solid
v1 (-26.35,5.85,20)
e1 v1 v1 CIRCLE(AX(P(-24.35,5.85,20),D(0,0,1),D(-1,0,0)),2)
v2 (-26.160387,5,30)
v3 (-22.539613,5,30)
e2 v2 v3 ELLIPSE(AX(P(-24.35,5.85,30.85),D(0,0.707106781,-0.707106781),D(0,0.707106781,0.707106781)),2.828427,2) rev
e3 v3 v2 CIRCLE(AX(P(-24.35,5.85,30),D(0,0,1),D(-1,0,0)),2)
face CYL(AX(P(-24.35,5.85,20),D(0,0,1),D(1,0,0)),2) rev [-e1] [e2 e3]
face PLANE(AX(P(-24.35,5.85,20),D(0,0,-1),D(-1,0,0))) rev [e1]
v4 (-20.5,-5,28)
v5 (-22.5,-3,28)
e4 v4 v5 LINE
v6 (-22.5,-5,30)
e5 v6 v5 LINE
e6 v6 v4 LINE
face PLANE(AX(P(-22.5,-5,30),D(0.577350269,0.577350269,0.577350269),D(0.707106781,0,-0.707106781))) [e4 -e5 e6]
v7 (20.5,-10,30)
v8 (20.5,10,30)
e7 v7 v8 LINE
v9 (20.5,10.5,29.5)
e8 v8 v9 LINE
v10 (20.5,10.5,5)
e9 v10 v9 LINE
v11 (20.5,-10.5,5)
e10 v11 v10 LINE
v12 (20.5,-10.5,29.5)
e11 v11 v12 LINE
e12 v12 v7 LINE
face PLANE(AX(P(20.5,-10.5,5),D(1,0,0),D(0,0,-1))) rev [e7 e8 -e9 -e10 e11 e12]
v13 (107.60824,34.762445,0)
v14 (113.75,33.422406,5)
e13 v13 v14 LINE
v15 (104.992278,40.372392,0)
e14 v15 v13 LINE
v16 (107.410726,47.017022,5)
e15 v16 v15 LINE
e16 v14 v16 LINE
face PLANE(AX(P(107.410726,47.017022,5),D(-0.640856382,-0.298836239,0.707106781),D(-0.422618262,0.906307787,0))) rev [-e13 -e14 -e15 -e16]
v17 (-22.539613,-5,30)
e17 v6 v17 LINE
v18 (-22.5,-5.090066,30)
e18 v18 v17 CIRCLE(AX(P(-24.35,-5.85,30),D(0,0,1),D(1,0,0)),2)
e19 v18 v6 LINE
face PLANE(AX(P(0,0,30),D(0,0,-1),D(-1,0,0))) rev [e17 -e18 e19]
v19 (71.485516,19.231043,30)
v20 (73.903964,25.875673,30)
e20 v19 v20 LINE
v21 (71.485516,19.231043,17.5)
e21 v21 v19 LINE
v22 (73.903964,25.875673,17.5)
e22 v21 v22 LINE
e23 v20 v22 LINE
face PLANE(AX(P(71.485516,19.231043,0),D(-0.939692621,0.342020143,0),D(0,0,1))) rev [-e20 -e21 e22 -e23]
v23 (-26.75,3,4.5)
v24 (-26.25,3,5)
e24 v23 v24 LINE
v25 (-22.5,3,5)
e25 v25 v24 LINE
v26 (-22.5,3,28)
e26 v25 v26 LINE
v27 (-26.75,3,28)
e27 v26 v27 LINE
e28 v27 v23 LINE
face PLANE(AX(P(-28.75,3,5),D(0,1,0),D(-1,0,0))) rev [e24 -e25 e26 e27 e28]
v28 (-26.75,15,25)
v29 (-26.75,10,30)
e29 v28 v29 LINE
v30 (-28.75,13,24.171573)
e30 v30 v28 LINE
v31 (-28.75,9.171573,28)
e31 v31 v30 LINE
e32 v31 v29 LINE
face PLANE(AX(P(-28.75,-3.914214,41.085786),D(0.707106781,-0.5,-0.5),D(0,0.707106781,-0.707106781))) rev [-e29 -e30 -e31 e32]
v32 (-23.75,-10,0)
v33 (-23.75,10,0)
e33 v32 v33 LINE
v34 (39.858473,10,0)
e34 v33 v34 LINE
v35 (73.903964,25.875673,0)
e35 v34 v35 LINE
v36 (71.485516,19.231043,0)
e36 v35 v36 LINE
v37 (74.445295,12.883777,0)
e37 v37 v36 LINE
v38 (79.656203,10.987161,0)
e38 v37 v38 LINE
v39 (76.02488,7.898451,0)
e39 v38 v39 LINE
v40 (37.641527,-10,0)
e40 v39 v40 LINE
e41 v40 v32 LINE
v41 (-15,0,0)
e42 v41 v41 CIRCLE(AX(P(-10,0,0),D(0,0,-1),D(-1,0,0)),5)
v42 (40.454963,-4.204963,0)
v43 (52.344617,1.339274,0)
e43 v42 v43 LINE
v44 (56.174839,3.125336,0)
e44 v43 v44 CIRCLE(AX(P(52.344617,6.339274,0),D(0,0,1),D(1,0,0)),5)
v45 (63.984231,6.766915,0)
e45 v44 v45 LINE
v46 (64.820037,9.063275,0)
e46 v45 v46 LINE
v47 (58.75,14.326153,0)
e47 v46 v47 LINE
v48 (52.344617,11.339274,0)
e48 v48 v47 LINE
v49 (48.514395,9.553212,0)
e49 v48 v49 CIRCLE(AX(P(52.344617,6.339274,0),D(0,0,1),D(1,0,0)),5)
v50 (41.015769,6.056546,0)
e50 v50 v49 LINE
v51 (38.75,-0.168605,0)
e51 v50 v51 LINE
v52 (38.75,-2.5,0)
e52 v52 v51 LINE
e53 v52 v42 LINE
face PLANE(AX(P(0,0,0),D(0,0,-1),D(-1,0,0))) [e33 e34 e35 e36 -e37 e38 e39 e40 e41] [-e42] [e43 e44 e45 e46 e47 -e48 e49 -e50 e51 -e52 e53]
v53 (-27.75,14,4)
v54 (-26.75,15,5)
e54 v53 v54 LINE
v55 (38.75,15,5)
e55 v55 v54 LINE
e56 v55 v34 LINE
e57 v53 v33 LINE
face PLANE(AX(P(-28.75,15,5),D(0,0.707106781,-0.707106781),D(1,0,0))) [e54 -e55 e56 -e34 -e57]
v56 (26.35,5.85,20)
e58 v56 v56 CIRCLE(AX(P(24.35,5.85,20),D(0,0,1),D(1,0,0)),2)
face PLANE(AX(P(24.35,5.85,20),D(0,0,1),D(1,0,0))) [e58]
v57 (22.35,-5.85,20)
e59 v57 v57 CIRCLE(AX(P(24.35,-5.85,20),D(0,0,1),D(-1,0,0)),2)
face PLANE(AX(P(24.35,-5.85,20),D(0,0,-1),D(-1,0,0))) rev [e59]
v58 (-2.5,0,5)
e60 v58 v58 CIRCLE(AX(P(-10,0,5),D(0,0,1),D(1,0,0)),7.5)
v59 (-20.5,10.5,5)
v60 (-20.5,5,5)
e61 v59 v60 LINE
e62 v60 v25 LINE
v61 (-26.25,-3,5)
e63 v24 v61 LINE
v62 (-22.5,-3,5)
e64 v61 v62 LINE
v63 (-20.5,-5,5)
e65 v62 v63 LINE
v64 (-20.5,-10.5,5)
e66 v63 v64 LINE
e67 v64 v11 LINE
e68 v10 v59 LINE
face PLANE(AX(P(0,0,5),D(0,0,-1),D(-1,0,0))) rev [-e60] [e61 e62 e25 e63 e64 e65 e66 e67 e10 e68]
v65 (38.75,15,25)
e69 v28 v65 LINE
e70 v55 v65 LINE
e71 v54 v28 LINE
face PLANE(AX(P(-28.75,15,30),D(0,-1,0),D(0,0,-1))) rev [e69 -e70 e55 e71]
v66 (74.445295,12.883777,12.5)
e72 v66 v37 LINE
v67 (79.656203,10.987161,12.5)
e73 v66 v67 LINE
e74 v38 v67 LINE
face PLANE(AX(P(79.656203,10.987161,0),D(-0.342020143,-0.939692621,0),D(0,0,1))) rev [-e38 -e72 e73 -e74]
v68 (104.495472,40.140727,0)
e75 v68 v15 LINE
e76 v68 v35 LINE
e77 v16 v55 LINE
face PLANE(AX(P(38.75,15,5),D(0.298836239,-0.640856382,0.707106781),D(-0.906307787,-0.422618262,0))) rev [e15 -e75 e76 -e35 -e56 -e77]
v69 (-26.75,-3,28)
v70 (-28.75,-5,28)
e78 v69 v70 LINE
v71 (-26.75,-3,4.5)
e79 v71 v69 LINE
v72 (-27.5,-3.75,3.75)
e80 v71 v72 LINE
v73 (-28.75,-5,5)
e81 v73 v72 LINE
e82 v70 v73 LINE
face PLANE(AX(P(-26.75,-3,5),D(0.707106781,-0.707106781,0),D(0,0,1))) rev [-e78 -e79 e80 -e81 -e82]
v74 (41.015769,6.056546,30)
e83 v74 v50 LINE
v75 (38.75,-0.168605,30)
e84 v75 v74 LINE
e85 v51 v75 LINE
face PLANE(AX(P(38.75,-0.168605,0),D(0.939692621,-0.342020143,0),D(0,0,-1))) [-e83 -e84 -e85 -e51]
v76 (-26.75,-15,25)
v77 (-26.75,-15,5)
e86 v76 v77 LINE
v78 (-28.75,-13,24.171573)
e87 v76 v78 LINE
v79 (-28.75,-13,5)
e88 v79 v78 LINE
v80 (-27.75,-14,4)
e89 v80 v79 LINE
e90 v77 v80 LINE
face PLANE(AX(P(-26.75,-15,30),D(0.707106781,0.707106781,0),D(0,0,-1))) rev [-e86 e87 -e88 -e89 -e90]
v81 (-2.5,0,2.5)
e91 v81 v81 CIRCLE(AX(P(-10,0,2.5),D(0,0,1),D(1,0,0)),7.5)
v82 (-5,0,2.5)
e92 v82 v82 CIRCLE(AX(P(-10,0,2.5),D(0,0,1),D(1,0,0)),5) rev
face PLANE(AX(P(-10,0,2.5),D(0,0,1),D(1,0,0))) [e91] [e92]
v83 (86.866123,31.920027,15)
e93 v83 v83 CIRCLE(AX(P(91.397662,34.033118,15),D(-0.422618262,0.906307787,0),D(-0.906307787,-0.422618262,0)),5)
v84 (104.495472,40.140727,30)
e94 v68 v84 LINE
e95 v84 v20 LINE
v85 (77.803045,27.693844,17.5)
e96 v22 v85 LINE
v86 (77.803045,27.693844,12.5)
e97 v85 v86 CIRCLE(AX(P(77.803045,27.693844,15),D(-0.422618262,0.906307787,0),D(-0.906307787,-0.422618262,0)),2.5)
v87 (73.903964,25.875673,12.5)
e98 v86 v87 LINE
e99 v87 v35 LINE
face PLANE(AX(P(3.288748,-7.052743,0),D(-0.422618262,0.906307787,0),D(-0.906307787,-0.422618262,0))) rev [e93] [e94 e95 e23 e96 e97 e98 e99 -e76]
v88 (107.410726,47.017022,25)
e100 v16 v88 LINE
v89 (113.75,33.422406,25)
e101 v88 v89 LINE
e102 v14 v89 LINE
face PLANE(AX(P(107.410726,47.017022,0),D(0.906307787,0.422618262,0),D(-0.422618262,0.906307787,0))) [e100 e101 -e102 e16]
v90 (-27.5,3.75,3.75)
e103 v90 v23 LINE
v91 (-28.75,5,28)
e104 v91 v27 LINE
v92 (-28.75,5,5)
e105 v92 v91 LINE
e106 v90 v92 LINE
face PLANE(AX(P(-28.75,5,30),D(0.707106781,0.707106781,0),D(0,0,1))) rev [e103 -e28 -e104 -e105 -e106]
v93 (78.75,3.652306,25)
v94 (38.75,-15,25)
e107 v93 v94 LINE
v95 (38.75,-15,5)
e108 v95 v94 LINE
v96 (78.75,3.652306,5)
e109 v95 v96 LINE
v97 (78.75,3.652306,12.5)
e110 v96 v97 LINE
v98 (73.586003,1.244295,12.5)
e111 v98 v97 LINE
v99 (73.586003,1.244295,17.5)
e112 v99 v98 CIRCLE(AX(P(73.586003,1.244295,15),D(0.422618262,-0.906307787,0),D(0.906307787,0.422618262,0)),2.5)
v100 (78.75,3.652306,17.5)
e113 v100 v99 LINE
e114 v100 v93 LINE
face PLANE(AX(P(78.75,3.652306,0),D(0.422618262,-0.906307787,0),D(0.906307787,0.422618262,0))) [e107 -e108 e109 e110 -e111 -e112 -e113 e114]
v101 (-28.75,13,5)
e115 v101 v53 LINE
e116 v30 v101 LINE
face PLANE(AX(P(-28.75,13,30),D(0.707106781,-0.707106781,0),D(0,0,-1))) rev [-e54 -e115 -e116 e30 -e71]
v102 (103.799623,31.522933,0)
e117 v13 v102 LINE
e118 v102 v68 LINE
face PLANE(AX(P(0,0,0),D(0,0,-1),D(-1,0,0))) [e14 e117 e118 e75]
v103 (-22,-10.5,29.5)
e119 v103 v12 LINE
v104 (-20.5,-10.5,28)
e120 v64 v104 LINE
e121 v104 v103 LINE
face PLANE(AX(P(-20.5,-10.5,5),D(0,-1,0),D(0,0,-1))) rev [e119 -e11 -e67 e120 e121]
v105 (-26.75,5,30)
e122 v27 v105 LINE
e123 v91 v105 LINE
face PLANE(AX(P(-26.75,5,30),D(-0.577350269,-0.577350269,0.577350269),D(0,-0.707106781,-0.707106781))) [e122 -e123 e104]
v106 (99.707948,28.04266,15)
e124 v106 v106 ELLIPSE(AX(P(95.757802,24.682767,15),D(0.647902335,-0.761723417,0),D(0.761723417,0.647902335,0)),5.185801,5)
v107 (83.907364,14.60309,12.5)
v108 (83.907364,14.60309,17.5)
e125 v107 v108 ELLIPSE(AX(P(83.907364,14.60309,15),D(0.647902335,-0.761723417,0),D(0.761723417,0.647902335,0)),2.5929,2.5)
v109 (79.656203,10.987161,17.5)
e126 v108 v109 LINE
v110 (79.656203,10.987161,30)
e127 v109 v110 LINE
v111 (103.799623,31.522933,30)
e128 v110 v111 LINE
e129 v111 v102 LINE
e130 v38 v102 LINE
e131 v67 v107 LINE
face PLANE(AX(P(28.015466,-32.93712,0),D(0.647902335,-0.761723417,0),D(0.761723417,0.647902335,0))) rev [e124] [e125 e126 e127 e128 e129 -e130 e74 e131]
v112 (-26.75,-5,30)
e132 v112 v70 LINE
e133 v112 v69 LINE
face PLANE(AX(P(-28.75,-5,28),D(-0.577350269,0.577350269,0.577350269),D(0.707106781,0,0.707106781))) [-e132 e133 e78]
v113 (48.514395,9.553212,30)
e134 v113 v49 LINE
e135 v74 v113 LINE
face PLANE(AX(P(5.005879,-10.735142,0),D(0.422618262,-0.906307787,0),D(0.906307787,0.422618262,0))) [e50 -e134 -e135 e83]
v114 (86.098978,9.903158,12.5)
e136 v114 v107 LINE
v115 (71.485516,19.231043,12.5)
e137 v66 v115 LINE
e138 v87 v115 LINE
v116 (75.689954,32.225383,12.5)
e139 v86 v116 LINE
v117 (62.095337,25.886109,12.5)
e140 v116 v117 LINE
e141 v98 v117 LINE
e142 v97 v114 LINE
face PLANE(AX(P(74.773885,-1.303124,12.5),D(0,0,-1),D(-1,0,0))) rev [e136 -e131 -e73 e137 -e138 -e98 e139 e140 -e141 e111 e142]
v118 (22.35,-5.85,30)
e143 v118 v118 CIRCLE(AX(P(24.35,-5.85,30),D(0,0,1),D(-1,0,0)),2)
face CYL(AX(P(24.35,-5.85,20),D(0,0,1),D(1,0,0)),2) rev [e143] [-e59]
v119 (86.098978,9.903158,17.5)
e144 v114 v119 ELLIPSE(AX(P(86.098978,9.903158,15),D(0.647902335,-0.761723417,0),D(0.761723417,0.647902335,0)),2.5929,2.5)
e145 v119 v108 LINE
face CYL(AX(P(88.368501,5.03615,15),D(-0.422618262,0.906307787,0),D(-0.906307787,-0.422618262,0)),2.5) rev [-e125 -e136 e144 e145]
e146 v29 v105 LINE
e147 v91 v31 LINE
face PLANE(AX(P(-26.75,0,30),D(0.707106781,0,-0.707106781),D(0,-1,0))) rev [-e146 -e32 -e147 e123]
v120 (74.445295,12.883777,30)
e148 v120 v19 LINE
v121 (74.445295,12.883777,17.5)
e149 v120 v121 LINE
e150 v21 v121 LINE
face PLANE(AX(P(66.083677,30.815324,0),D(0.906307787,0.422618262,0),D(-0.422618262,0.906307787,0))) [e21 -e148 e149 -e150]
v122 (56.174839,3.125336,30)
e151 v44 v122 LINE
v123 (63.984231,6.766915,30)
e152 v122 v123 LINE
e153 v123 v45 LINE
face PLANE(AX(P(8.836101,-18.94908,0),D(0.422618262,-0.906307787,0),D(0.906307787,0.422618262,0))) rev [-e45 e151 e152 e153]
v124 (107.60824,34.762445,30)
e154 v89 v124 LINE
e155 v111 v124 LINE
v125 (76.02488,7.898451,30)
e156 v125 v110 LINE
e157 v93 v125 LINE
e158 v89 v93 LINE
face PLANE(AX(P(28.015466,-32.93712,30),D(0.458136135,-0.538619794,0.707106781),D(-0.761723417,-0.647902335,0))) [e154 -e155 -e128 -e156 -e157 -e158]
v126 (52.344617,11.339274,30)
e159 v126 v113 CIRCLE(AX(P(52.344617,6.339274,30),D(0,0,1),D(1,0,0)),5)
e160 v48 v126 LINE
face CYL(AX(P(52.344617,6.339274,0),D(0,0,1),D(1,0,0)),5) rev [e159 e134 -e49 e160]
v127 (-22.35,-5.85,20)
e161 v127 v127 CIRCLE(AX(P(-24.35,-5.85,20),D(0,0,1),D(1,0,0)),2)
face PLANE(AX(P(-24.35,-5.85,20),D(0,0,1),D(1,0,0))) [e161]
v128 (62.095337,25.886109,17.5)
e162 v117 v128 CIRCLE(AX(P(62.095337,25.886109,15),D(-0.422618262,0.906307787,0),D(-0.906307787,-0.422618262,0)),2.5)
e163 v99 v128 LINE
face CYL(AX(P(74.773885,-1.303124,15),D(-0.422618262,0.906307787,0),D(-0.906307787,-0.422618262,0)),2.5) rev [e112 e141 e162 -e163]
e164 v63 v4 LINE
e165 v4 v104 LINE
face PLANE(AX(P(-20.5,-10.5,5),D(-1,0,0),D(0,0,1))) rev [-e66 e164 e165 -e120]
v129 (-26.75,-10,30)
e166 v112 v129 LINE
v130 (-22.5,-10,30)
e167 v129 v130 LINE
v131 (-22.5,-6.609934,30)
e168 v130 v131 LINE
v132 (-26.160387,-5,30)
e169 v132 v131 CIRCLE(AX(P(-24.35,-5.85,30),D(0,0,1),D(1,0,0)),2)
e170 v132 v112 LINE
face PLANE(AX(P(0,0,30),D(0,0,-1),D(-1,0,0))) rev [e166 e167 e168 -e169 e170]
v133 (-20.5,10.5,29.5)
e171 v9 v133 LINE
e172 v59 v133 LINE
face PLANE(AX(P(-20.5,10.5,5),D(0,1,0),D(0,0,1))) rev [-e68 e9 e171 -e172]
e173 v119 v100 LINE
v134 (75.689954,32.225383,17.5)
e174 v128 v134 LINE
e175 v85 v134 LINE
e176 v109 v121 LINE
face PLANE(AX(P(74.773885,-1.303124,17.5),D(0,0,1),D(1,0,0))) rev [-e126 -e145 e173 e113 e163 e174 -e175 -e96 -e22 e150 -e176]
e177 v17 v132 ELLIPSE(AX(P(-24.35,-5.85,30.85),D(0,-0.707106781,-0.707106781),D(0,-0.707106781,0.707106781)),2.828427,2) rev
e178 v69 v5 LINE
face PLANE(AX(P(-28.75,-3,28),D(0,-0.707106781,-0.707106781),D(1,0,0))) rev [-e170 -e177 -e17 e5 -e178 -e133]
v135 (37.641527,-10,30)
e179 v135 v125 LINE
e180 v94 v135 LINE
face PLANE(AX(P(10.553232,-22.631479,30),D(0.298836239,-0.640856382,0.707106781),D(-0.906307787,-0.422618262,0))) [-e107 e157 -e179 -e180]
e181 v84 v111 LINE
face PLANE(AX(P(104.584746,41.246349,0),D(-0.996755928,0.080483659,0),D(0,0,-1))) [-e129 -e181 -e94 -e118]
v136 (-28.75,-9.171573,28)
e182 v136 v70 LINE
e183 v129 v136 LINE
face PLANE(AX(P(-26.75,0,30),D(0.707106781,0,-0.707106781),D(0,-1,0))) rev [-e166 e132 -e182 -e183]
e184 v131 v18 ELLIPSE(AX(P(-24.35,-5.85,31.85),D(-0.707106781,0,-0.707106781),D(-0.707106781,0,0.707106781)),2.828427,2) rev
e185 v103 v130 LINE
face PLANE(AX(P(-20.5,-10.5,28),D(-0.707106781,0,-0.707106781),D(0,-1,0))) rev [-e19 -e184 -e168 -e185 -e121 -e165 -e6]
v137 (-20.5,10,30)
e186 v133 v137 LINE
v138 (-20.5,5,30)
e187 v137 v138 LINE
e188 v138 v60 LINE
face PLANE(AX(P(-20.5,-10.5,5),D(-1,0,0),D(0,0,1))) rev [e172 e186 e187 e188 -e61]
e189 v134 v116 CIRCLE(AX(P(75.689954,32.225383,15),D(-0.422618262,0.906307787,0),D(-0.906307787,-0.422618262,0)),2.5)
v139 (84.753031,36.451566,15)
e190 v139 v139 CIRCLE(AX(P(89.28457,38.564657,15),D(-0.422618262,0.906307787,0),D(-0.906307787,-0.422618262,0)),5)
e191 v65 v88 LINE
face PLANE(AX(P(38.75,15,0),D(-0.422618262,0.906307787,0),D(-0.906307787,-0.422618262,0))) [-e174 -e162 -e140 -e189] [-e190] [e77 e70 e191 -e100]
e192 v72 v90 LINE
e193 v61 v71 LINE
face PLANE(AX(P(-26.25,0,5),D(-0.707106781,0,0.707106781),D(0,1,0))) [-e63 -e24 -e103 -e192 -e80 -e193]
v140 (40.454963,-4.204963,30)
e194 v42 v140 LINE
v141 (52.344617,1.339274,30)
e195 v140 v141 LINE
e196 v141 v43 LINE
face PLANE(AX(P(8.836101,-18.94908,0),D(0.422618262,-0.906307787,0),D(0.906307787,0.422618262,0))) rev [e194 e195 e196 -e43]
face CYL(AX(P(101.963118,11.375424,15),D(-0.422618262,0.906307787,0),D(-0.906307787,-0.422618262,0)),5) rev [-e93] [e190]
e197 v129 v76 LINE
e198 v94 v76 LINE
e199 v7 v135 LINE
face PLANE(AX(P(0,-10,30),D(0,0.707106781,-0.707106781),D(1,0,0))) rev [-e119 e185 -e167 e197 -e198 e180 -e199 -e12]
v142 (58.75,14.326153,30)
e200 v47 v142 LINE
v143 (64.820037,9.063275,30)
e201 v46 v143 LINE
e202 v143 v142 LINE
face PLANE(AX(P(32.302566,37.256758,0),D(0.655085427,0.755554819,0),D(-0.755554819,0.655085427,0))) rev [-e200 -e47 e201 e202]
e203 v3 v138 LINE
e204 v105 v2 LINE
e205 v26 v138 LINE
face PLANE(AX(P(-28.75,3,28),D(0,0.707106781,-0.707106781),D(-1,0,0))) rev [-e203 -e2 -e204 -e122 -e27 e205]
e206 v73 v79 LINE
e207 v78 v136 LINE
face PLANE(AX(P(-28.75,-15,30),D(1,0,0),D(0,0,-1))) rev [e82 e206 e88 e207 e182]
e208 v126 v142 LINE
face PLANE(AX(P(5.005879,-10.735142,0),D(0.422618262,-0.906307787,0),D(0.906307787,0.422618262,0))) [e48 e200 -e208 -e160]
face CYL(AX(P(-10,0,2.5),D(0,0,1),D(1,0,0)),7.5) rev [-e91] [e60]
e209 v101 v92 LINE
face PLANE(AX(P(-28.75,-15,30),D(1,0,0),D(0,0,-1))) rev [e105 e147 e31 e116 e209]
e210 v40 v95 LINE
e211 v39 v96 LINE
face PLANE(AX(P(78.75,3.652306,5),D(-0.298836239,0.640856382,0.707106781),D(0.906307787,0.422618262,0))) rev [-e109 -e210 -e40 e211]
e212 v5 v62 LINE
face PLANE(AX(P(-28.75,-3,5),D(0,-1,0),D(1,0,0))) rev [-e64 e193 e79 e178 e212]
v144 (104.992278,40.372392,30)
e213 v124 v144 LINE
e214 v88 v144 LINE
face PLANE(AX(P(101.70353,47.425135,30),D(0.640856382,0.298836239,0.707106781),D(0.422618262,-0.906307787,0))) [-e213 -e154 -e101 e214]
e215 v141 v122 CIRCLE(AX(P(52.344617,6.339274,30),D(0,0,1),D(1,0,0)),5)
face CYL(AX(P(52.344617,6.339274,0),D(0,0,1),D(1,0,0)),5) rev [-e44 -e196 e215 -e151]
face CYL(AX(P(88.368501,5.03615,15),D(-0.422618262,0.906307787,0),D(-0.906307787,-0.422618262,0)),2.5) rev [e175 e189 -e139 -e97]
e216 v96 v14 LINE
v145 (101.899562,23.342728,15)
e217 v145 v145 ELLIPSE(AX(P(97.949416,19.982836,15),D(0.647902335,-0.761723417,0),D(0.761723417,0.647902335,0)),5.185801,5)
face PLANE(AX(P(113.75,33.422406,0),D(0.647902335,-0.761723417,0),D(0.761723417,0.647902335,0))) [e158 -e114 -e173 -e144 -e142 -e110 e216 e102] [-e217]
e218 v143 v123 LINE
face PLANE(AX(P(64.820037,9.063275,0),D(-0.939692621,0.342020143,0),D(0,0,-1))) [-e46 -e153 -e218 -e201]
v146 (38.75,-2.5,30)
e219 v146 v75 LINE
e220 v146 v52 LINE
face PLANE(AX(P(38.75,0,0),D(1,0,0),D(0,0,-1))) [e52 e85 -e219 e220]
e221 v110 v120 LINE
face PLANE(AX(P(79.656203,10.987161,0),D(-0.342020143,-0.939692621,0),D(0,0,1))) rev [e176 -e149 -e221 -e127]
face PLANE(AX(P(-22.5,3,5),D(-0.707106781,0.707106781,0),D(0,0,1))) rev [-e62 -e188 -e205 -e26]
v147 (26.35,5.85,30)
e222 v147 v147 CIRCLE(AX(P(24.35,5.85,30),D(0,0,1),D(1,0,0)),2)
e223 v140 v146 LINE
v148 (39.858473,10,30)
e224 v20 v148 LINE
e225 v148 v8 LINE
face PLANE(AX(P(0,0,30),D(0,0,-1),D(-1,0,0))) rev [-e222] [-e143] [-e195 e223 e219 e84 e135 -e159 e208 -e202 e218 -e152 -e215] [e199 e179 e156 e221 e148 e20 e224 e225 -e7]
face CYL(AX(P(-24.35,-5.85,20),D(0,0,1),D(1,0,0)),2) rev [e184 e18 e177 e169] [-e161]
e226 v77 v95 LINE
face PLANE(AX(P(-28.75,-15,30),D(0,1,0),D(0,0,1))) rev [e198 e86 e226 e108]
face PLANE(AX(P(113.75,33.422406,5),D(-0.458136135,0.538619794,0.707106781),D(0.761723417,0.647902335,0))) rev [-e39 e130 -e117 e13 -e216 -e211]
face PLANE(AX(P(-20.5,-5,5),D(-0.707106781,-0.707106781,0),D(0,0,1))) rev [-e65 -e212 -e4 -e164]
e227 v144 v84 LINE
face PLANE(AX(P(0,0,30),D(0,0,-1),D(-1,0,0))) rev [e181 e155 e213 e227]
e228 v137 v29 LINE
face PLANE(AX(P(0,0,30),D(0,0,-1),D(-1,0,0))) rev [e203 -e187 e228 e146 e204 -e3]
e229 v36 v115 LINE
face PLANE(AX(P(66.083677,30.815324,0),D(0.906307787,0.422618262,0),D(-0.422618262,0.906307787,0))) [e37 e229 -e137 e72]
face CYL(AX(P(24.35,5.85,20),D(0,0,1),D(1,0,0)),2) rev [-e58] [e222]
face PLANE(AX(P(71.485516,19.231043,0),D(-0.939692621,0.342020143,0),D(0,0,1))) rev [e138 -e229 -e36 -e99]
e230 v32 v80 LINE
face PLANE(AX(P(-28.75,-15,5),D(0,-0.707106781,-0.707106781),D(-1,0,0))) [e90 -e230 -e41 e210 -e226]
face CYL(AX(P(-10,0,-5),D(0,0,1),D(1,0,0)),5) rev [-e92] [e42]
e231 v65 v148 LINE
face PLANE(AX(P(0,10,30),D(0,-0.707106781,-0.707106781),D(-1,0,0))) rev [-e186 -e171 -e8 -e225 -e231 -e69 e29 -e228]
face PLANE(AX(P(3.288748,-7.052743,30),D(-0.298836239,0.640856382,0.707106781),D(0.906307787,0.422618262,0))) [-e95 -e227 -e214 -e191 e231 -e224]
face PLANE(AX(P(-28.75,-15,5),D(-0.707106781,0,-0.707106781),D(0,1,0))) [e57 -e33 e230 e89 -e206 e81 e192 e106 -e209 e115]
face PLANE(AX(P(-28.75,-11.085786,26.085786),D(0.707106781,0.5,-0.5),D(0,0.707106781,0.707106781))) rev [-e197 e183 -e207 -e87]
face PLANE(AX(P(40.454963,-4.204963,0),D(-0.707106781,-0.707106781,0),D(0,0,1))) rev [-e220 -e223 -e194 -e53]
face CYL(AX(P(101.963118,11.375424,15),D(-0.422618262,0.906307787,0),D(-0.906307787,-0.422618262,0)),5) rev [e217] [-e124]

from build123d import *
from OCP.BRepFilletAPI import BRepFilletAPI_MakeChamfer

# Parameters (mm, degrees)
SKETCH1_W           = 57.5
SKETCH1_H           = 30
BOSS_EXTRUDE1_DEPTH = 30
SKETCH2_W           = 41
SKETCH2_H           = 21
CUT_EXTRUDE1_DEPTH  = 25
SKETCH8_R           = 2
CUT_EXTRUDE6_DEPTH  = 10
SKETCH9_W           = 8.25
SKETCH9_H           = 6
CUT_EXTRUDE7_DEPTH  = 25
SKETCH10_R          = 5
CUT_EXTRUDE8_DEPTH  = 10
BOSS_EXTRUDE4_DEPTH = 30
CUT_EXTRUDE9_DEPTH  = 30
CHAMFER3_SIZE       = 5
CHAMFER3_SIZE_2     = 7.15419636
CHAMFER3_SIZE_3     = 4.066852786
SKETCH16_R          = 5
CUT_EXTRUDE10_DEPTH = 30
CHAMFER5_SIZE       = 5
CHAMFER6_SIZE       = 2
CHAMFER7_SIZE       = 2.5
CHAMFER7_SIZE_2     = 1.767766953
CHAMFER8_SIZE       = 2.5
CHAMFER8_SIZE2      = 1.892599607
CHAMFER8_SIZE2_2    = 1.881218298
CHAMFER8_SIZE2_3    = 5.168604796
SKETCH19_R          = 5
CUT_EXTRUDE12_DEPTH = 30
SKETCH20_R          = 7.5
CUT_EXTRUDE13_DEPTH = 2.5


with BuildPart() as part:
    # Sketch1 → Boss-Extrude1 (new body)
    with BuildSketch(Plane.XY):
        Rectangle(SKETCH1_W, SKETCH1_H)
    extrude(amount=BOSS_EXTRUDE1_DEPTH)

    # Sketch2 → Cut-Extrude1 (cut)
    with BuildSketch(Plane.XY.offset(30)):
        Rectangle(SKETCH2_W, SKETCH2_H)
    extrude(amount=-CUT_EXTRUDE1_DEPTH, mode=Mode.SUBTRACT)

    # Sketch8 → Cut-Extrude6 (cut)
    with BuildSketch(Plane.XY.offset(30)):
        with Locations((24.35, 5.85)):
            Circle(SKETCH8_R)
        with Locations(Location((24.35, -5.85, 0), (0, 0, 180))):
            Circle(SKETCH8_R)
        with Locations((-24.35, -5.85)):
            Circle(SKETCH8_R)
        with Locations(Location((-24.35, 5.85, 0), (0, 0, 180))):
            Circle(SKETCH8_R)
    extrude(amount=-CUT_EXTRUDE6_DEPTH, mode=Mode.SUBTRACT)

    # Sketch9 → Cut-Extrude7 (cut)
    with BuildSketch(Plane.XY.offset(30)):
        with Locations((-24.625, 0)):
            Rectangle(SKETCH9_W, SKETCH9_H)
    extrude(amount=-CUT_EXTRUDE7_DEPTH, mode=Mode.SUBTRACT)

    # Sketch10 → Cut-Extrude8 (cut)
    with BuildSketch(Plane.XY.offset(5)):
        with Locations((-10, 0)):
            Circle(SKETCH10_R)
    extrude(amount=-CUT_EXTRUDE8_DEPTH, mode=Mode.SUBTRACT)

    # Sketch13 → Boss-Extrude4 (add)
    with BuildSketch(Plane.XY.offset(30)):
        Polygon((28.75, 15), (38.75, 15), (107.410726074, 47.017022383), (113.75, 33.422405577), (78.75, 3.652306326), (38.75, -15), (28.75, -15), align=None)
    extrude(amount=-BOSS_EXTRUDE4_DEPTH)

    # Sketch15 → Cut-Extrude9 (cut)
    with BuildSketch(Plane.XY.offset(30)):
        Polygon((38.75, 5), (38.75, 0), (38.75, -5), (66.25, 7.823460599), (58.75, 14.326153163), align=None)
        Polygon((76.558385836, 8.352238067), (69.372424662, 23.762581536), (104.992278447, 40.372392139), (107.608239852, 34.762444803), align=None)
    extrude(amount=-CUT_EXTRUDE9_DEPTH, mode=Mode.SUBTRACT)

    # Chamfer3
    # the kernel refuses this chamfer: 7.15419636, 5, 4.066852786 mm, written as the material it adds along each edge
    with BuildSketch(Plane(origin=(107.608239852, 34.762444803, 30), x_dir=(-0.7359660221939145, -0.6770184740286387, 0), z_dir=(0, 0, -1))) as chamfer3_piece_1:
        Polygon((CHAMFER3_SIZE * 0.999244403531, CHAMFER3_SIZE * 0.0388667211355), (-CHAMFER3_SIZE_2 * 0.302554433968, CHAMFER3_SIZE_2 * 0.953132107531), (0, 0), align=None)
    extrude(amount=30)
    with BuildSketch(Plane(origin=(69.372424662, 23.762581536, 30), x_dir=(0.8943448678110075, 0.4473782040065334, 0), z_dir=(0, 0, -1))) as chamfer3_piece_2:
        Polygon((CHAMFER3_SIZE * 0.999621916911, CHAMFER3_SIZE * 0.0274958766106), (-CHAMFER3_SIZE * 0.0274958766106, CHAMFER3_SIZE * 0.999621916911), (0, 0), align=None)
    extrude(amount=30)
    with BuildSketch(Plane(origin=(76.558385836, 8.352238067, 30), x_dir=(0.7880798878250118, 0.615572977319275, 0), z_dir=(0, 0, -1))) as chamfer3_piece_3:
        Polygon((CHAMFER3_SIZE_3 * 0.999130074634, -CHAMFER3_SIZE_3 * 0.0417024478214), (CHAMFER3_SIZE * 0.224841630528, -CHAMFER3_SIZE * 0.974395320792), (0, 0), align=None)
    extrude(amount=30)

    # Sketch16 → Cut-Extrude10 (cut)
    with BuildSketch(Plane(origin=(1.175656739, -2.521204013, 0), x_dir=(0.9063077870366488, 0.42261826174070183, 0), z_dir=(-0.42261826174070183, 0.9063077870366488, 0))):
        with Locations((97.217429724, -15)):
            Circle(SKETCH16_R)
        with BuildLine():
            Line((67.217429724, -12.5), (82.217429724, -12.5))
            ThreePointArc((82.217429724, -12.5), (84.717429724, -15), (82.217429724, -17.5))
            Line((82.217429724, -17.5), (67.217429724, -17.5))
            ThreePointArc((67.217429724, -17.5), (64.717429724, -15), (67.217429724, -12.5))
        make_face()
    extrude(amount=-CUT_EXTRUDE10_DEPTH, mode=Mode.SUBTRACT)

    # Chamfer5
    # the kernel refuses this chamfer: 5 mm, written as the material it takes off along each edge
    with BuildSketch(Plane(origin=(-28.75, 27.85841494, 0), x_dir=(-0.027495876610586313, 0, 0.9996219169112968), z_dir=(0, -1, 0))) as chamfer5_piece_1:
        Polygon((CHAMFER5_SIZE * 0.999621916911, -CHAMFER5_SIZE * 0.0274958766106), (-CHAMFER5_SIZE * 0.0274958766106, -CHAMFER5_SIZE * 0.999621916911), (0, 0), align=None)
    extrude(amount=55.71682988, mode=Mode.SUBTRACT)
    with BuildSketch(Plane(origin=(-41.60841494, -15, 0), x_dir=(0, -0.027495876610586317, 0.9996219169112968), z_dir=(1, 0, 0))) as chamfer5_piece_2:
        Polygon((CHAMFER5_SIZE * 0.999621916911, -CHAMFER5_SIZE * 0.0274958766106), (-CHAMFER5_SIZE * 0.0274958766106, -CHAMFER5_SIZE * 0.999621916911), (0, 0), align=None)
    extrude(amount=93.21682988, mode=Mode.SUBTRACT)
    with BuildSketch(Plane(origin=(90.403681589, 9.086507297, 30), x_dir=(-0.4224584769229525, 0.905965127389214, 0.02749587661058635), z_dir=(-0.9063077870366526, -0.4226182617406939, 0)), Plane(origin=(90.403681589, 9.086507297, 0), x_dir=(0.01162025957820246, -0.02491972708357306, 0.9996219169112968), z_dir=(-0.9063077870366526, -0.4226182617406939, 0))) as chamfer5_piece_3:
        Polygon((CHAMFER5_SIZE * 0.999621916911, CHAMFER5_SIZE * 0.0274958766106), (-CHAMFER5_SIZE * 0.0274958766106, CHAMFER5_SIZE * 0.999621916911), (0, 0), align=None)
    extrude(amount=69.851946638, mode=Mode.SUBTRACT)
    with BuildSketch(Plane(origin=(123.544555766, 41.753402643, 0), x_dir=(0.017814642661908332, -0.02094425308797373, 0.9996219169112968), z_dir=(-0.7617234170999287, -0.6479023351104763, 0)), Plane(origin=(123.544555766, 41.753402643, 30), x_dir=(-0.6476573741944397, 0.7614354223576539, 0.027495876610586372), z_dir=(-0.7617234170999287, -0.6479023351104763, 0))) as chamfer5_piece_4:
        Polygon((CHAMFER5_SIZE * 0.999621916911, CHAMFER5_SIZE * 0.0274958766106), (-CHAMFER5_SIZE * 0.0274958766106, CHAMFER5_SIZE * 0.999621916911), (0, 0), align=None)
    extrude(amount=71.665266299, mode=Mode.SUBTRACT)
    with BuildSketch(Plane(origin=(101.976525103, 58.670703972, 30), x_dir=(-0.9059651273892108, -0.42245847692295924, 0.027495876610586337), z_dir=(0.42261826174070055, -0.9063077870366495, 0)), Plane(origin=(101.976525103, 58.670703972, 0), x_dir=(0.024919727083572332, 0.011620259578202343, 0.9996219169112968), z_dir=(0.42261826174070055, -0.9063077870366495, 0))) as chamfer5_piece_5:
        Polygon((CHAMFER5_SIZE * 0.999621916911, CHAMFER5_SIZE * 0.0274958766106), (-CHAMFER5_SIZE * 0.0274958766106, CHAMFER5_SIZE * 0.999621916911), (0, 0), align=None)
    extrude(amount=40.71682988, mode=Mode.SUBTRACT)
    with BuildSketch(Plane(origin=(27.096318411, 9.565799029, 30), x_dir=(0.4224584769229604, -0.9059651273892103, 0.027495876610586324), z_dir=(0.9063077870366489, 0.4226182617407018, 0))) as chamfer5_piece_6_section:
        Polygon((CHAMFER5_SIZE * 0.999621916911, CHAMFER5_SIZE * 0.0274958766106), (-CHAMFER5_SIZE * 0.0274958766106, CHAMFER5_SIZE * 0.999621916911), (0, 0), align=None)
    chamfer5_piece_6 = extrude(amount=101.47555893, mode=Mode.PRIVATE)
    chamfer5_piece_6 = split(chamfer5_piece_6, bisect_by=Plane(origin=(81.150743587, 15, 28.329639499), z_dir=(0, 1, 0)), keep=Keep.TOP, mode=Mode.PRIVATE)
    add(chamfer5_piece_6, mode=Mode.SUBTRACT)
    with BuildSketch(Plane(origin=(27.096318411, 9.565799029, 0), x_dir=(-0.011620259578202905, 0.02491972708357345, 0.9996219169112968), z_dir=(0.9063077870366489, 0.4226182617407018, 0))) as chamfer5_piece_7_section:
        Polygon((CHAMFER5_SIZE * 0.999621916911, CHAMFER5_SIZE * 0.0274958766106), (-CHAMFER5_SIZE * 0.0274958766106, CHAMFER5_SIZE * 0.999621916911), (0, 0), align=None)
    chamfer5_piece_7 = extrude(amount=101.47555893, mode=Mode.PRIVATE)
    chamfer5_piece_7 = split(chamfer5_piece_7, bisect_by=Plane(origin=(81.150743587, 15, 1.670360501), z_dir=(0, 1, 0)), keep=Keep.TOP, mode=Mode.PRIVATE)
    add(chamfer5_piece_7, mode=Mode.SUBTRACT)
    with BuildSketch(Plane(origin=(-41.60841494, 15, 0), x_dir=(0, 0.027495876610586317, 0.9996219169112968), z_dir=(1, 0, 0))) as chamfer5_piece_8_section:
        Polygon((CHAMFER5_SIZE * 0.999621916911, CHAMFER5_SIZE * 0.0274958766106), (-CHAMFER5_SIZE * 0.0274958766106, CHAMFER5_SIZE * 0.999621916911), (0, 0), align=None)
    chamfer5_piece_8 = extrude(amount=93.21682988, mode=Mode.PRIVATE)
    chamfer5_piece_8 = split(chamfer5_piece_8, bisect_by=Plane(origin=(3.719146846, -1.335155097, 1.672660276), z_dir=(-0.4226182617407018, 0.9063077870366489, 0)), keep=Keep.TOP, mode=Mode.PRIVATE)
    add(chamfer5_piece_8, mode=Mode.SUBTRACT)
    with BuildSketch(Plane(origin=(51.60841494, -15, 30), x_dir=(0, 0.9996219169112968, 0.027495876610586355), z_dir=(-1, 0, 0))) as chamfer5_piece_9:
        Polygon((CHAMFER5_SIZE * 0.999621916911, CHAMFER5_SIZE * 0.0274958766106), (-CHAMFER5_SIZE * 0.0274958766106, CHAMFER5_SIZE * 0.999621916911), (0, 0), align=None)
    extrude(amount=93.21682988, mode=Mode.SUBTRACT)
    with BuildSketch(Plane(origin=(51.60841494, 15, 30), x_dir=(0, -0.9996219169112968, 0.02749587661058629), z_dir=(-1, 0, 0))) as chamfer5_piece_10_section:
        Polygon((CHAMFER5_SIZE * 0.999621916911, -CHAMFER5_SIZE * 0.0274958766106), (-CHAMFER5_SIZE * 0.0274958766106, -CHAMFER5_SIZE * 0.999621916911), (0, 0), align=None)
    chamfer5_piece_10 = extrude(amount=93.21682988, mode=Mode.PRIVATE)
    chamfer5_piece_10 = split(chamfer5_piece_10, bisect_by=Plane(origin=(3.719146846, -1.335155097, 28.327339724), z_dir=(-0.4226182617407018, 0.9063077870366489, 0)), keep=Keep.TOP, mode=Mode.PRIVATE)
    add(chamfer5_piece_10, mode=Mode.SUBTRACT)
    with BuildSketch(Plane(origin=(27.096318411, 9.565799029, 30), x_dir=(0.4224584769229604, -0.9059651273892103, 0.027495876610586324), z_dir=(0.9063077870366489, 0.4226182617407018, 0))) as chamfer5_piece_11a_section:
        Polygon((CHAMFER5_SIZE * 0.999621916911, CHAMFER5_SIZE * 0.0274958766106), (-CHAMFER5_SIZE * 0.0274958766106, CHAMFER5_SIZE * 0.999621916911), (0, 0), align=None)
    chamfer5_piece_11a = extrude(amount=101.47555893, mode=Mode.PRIVATE)
    chamfer5_piece_11a = split(chamfer5_piece_11a, bisect_by=Plane(origin=(35.512062488, 15, 28.462048788), z_dir=(0, -1, 0)), keep=Keep.TOP, mode=Mode.PRIVATE)
    with BuildSketch(Plane(origin=(51.60841494, 15, 30), x_dir=(0, -0.9996219169112968, 0.02749587661058629), z_dir=(-1, 0, 0))) as chamfer5_piece_11b_section:
        Polygon((CHAMFER5_SIZE * 0.999621916911, -CHAMFER5_SIZE * 0.0274958766106), (-CHAMFER5_SIZE * 0.0274958766106, -CHAMFER5_SIZE * 0.999621916911), (0, 0), align=None)
    chamfer5_piece_11b = extrude(amount=93.21682988, mode=Mode.PRIVATE)
    chamfer5_piece_11b = split(chamfer5_piece_11b, bisect_by=Plane(origin=(41.684567981, 16.368411523, 28.462048788), z_dir=(0.4226182617407018, -0.9063077870366489, 0)), keep=Keep.TOP, mode=Mode.PRIVATE)
    chamfer5_piece_11 = chamfer5_piece_11a & chamfer5_piece_11b
    add(chamfer5_piece_11, mode=Mode.SUBTRACT)
    with BuildSketch(Plane(origin=(27.096318411, 9.565799029, 0), x_dir=(-0.011620259578202905, 0.02491972708357345, 0.9996219169112968), z_dir=(0.9063077870366489, 0.4226182617407018, 0))) as chamfer5_piece_12a_section:
        Polygon((CHAMFER5_SIZE * 0.999621916911, CHAMFER5_SIZE * 0.0274958766106), (-CHAMFER5_SIZE * 0.0274958766106, CHAMFER5_SIZE * 0.999621916911), (0, 0), align=None)
    chamfer5_piece_12a = extrude(amount=101.47555893, mode=Mode.PRIVATE)
    chamfer5_piece_12a = split(chamfer5_piece_12a, bisect_by=Plane(origin=(35.512062488, 15, 1.537951212), z_dir=(0, -1, 0)), keep=Keep.TOP, mode=Mode.PRIVATE)
    with BuildSketch(Plane(origin=(-41.60841494, 15, 0), x_dir=(0, 0.027495876610586317, 0.9996219169112968), z_dir=(1, 0, 0))) as chamfer5_piece_12b_section:
        Polygon((CHAMFER5_SIZE * 0.999621916911, CHAMFER5_SIZE * 0.0274958766106), (-CHAMFER5_SIZE * 0.0274958766106, CHAMFER5_SIZE * 0.999621916911), (0, 0), align=None)
    chamfer5_piece_12b = extrude(amount=93.21682988, mode=Mode.PRIVATE)
    chamfer5_piece_12b = split(chamfer5_piece_12b, bisect_by=Plane(origin=(41.684567981, 16.368411523, 1.537951212), z_dir=(0.4226182617407018, -0.9063077870366489, 0)), keep=Keep.TOP, mode=Mode.PRIVATE)
    chamfer5_piece_12 = chamfer5_piece_12a & chamfer5_piece_12b
    add(chamfer5_piece_12, mode=Mode.SUBTRACT)

    # Chamfer6
    # the kernel refuses this chamfer: 2 mm, written as the material it takes off along each edge
    with BuildSketch(Plane(origin=(-21.833333333, -4.333333333, 28.666666667), x_dir=(0.7071067811865551, 2.5121479338940134e-15, -0.70710678118654), z_dir=(0.577350269189621, 0.5773502691896211, 0.5773502691896353)), Plane(origin=(-27.416666667, -4.333333333, 28.666666667), x_dir=(8.79251776862911e-15, 0.70710678118655, -0.7071067811865451), z_dir=(-0.5773502691896274, 0.5773502691896265, 0.5773502691896233))) as chamfer6_piece_1:
        Polygon((-1.414213562, -0.816496581), (1.414213562, -0.816496581), (0, 1.632993162), align=None)
    extrude(amount=2.540341184, mode=Mode.SUBTRACT)
    with BuildSketch(Plane(origin=(-27.416666667, 4.333333333, 28.666666667), x_dir=(-0.7071067811865468, 0.7071067811865483, 0), z_dir=(-0.5773502691896283, -0.577350269189627, 0.5773502691896221))) as chamfer6_piece_2:
        Polygon((-1.414213562, 0.816496581), (1.414213562, 0.816496581), (0, -1.632993162), align=None)
    extrude(amount=2.540341184, mode=Mode.SUBTRACT)
    with BuildSketch(Plane(origin=(-28.75, -15, -0.143365976), x_dir=(-0.027495876610585623, 0.9996219169112968, 0), z_dir=(0, 0, 1))) as chamfer6_piece_3:
        Polygon((CHAMFER6_SIZE * 0.999621916911, -CHAMFER6_SIZE * 0.0274958766106), (-CHAMFER6_SIZE * 0.0274958766106, -CHAMFER6_SIZE * 0.999621916911), (0, 0), align=None)
    extrude(amount=30.286731952, mode=Mode.SUBTRACT)
    with BuildSketch(Plane(origin=(-28.75, -6.36309104, 33.63690896), x_dir=(0.9996219169112968, -0.019442520806022014, 0.019442520806006464), z_dir=(0, -0.7071067811862648, -0.7071067811868302))) as chamfer6_piece_4:
        Polygon((CHAMFER6_SIZE * 0.999621916911, -CHAMFER6_SIZE * 0.0274958766106), (-CHAMFER6_SIZE * 0.0274958766106, -CHAMFER6_SIZE * 0.999621916911), (0, 0), align=None)
    extrude(amount=17.357799764, mode=Mode.SUBTRACT)
    with BuildSketch(Plane(origin=(-20.5, 2.143365976, 30), x_dir=(-0.9996219169112968, 0, 0.02749587661058522), z_dir=(0, -1, 0))) as chamfer6_piece_5_section:
        Polygon((CHAMFER6_SIZE * 0.999621916911, CHAMFER6_SIZE * 0.0274958766106), (-CHAMFER6_SIZE * 0.0274958766106, CHAMFER6_SIZE * 0.999621916911), (0, 0), align=None)
    chamfer6_piece_5 = extrude(amount=17.286731952, mode=Mode.PRIVATE)
    chamfer6_piece_5 = split(chamfer6_piece_5, bisect_by=Plane(origin=(-21.161947574, -10.5, 29.325063892), z_dir=(0, 1, 0)), keep=Keep.TOP, mode=Mode.PRIVATE)
    add(chamfer6_piece_5, mode=Mode.SUBTRACT)
    with BuildSketch(Plane(origin=(-28.75, 2.143365976, 30), x_dir=(0.9996219169112965, 0, 0.027495876610587746), z_dir=(0, -1, 0))) as chamfer6_piece_6:
        Polygon((CHAMFER6_SIZE * 0.999621916911, -CHAMFER6_SIZE * 0.0274958766106), (-CHAMFER6_SIZE * 0.0274958766106, -CHAMFER6_SIZE * 0.999621916911), (0, 0), align=None)
    extrude(amount=17.286731952, mode=Mode.SUBTRACT)
    with BuildSketch(Plane(origin=(-28.75, -3, 35.143365976), x_dir=(-0.027495876610585623, -0.9996219169112968, 0), z_dir=(0, 0, -1)), Plane(origin=(-20.5, 3, 35.143365976), x_dir=(0.027495876610585623, 0.9996219169112968, 0), z_dir=(0, 0, -1))) as chamfer6_piece_7:
        Polygon((CHAMFER6_SIZE * 0.999621916911, -CHAMFER6_SIZE * 0.0274958766106), (-CHAMFER6_SIZE * 0.0274958766106, -CHAMFER6_SIZE * 0.999621916911), (0, 0), align=None)
    extrude(amount=30.143365976, mode=Mode.SUBTRACT)
    with BuildSketch(Plane(origin=(-20.5, -3, 35.143365976), x_dir=(0.027495876610585623, -0.9996219169112968, 0), z_dir=(0, 0, -1)), Plane(origin=(-28.75, 3, 35.143365976), x_dir=(-0.027495876610585623, 0.9996219169112968, 0), z_dir=(0, 0, -1))) as chamfer6_piece_8:
        Polygon((CHAMFER6_SIZE * 0.999621916911, CHAMFER6_SIZE * 0.0274958766106), (-CHAMFER6_SIZE * 0.0274958766106, CHAMFER6_SIZE * 0.999621916911), (0, 0), align=None)
    extrude(amount=30.143365976, mode=Mode.SUBTRACT)
    with BuildSketch(Plane(origin=(-33.893365976, -3, 30), x_dir=(0, -0.9996219169112968, 0.027495876610585432), z_dir=(1, 0, 0)), Plane(origin=(-15.356634024, 3, 30), x_dir=(0, 0.9996219169112968, 0.027495876610585716), z_dir=(-1, 0, 0))) as chamfer6_piece_9:
        Polygon((CHAMFER6_SIZE * 0.999621916911, CHAMFER6_SIZE * 0.0274958766106), (-CHAMFER6_SIZE * 0.0274958766106, CHAMFER6_SIZE * 0.999621916911), (0, 0), align=None)
    extrude(amount=18.536731952, mode=Mode.SUBTRACT)
    with BuildSketch(Plane(origin=(-28.75, 15, -0.143365976), x_dir=(-0.027495876610585623, -0.9996219169112968, 0), z_dir=(0, 0, 1))) as chamfer6_piece_10:
        Polygon((CHAMFER6_SIZE * 0.999621916911, CHAMFER6_SIZE * 0.0274958766106), (-CHAMFER6_SIZE * 0.0274958766106, CHAMFER6_SIZE * 0.999621916911), (0, 0), align=None)
    extrude(amount=30.286731952, mode=Mode.SUBTRACT)
    with BuildSketch(Plane(origin=(-28.75, 6.36309104, 33.63690896), x_dir=(0.9996219169112968, 0.019442520806021366, 0.019442520806005816), z_dir=(0, 0.7071067811862648, -0.7071067811868302))) as chamfer6_piece_11:
        Polygon((CHAMFER6_SIZE * 0.999621916911, CHAMFER6_SIZE * 0.0274958766106), (-CHAMFER6_SIZE * 0.0274958766106, CHAMFER6_SIZE * 0.999621916911), (0, 0), align=None)
    extrude(amount=17.357799764, mode=Mode.SUBTRACT)
    with BuildSketch(Plane(origin=(-28.75, 15.143365976, 30), x_dir=(-0.0274958766105856, 0, -0.9996219169112968), z_dir=(0, -1, 0))) as chamfer6_piece_12:
        Polygon((CHAMFER6_SIZE * 0.999621916911, CHAMFER6_SIZE * 0.0274958766106), (-CHAMFER6_SIZE * 0.0274958766106, CHAMFER6_SIZE * 0.999621916911), (0, 0), align=None)
    extrude(amount=17.286731952, mode=Mode.SUBTRACT)

    # Chamfer7
    # the kernel refuses this chamfer: 2.5, 1.767766953 mm, written as the material it adds along each edge
    # the kernel refuses this chamfer: 2.5, 1.767766953 mm, written as the material it takes off along each edge
    with BuildSketch(Plane(origin=(-28.75, 5, 5), x_dir=(0.9996219169112968, 0, 0.027495876610586317), z_dir=(0, -1, 0))) as chamfer7_2_piece_1_section:
        Polygon((CHAMFER7_SIZE * 0.999621916911, -CHAMFER7_SIZE * 0.0274958766106), (CHAMFER7_SIZE_2 * 0.687396915251, -CHAMFER7_SIZE_2 * 0.726281956863), (0, 0), align=None)
    chamfer7_2_piece_1 = extrude(amount=10, mode=Mode.PRIVATE)
    chamfer7_2_piece_1 = split(chamfer7_2_piece_1, bisect_by=Plane(origin=(-27.555267467, 3.805267467, 4.588427948), z_dir=(-0.7071067811862649, -0.7071067811868302, 0)), keep=Keep.TOP, mode=Mode.PRIVATE)
    chamfer7_2_piece_1 = split(chamfer7_2_piece_1, bisect_by=Plane(origin=(-24.018422489, -0.268422489, 4.588427948), z_dir=(-0.7071067811862649, 0.7071067811868302, 0)), keep=Keep.TOP, mode=Mode.PRIVATE)
    add(chamfer7_2_piece_1, mode=Mode.SUBTRACT)
    with BuildSketch(Plane(origin=(-28.75, 5, 5), x_dir=(0.9996219169112968, 0, 0.027495876610586317), z_dir=(0, -1, 0))) as chamfer7_2_piece_2_section:
        Polygon((CHAMFER7_SIZE * 0.999621916911, -CHAMFER7_SIZE * 0.0274958766106), (CHAMFER7_SIZE_2 * 0.687396915251, -CHAMFER7_SIZE_2 * 0.726281956863), (0, 0), align=None)
    chamfer7_2_piece_2 = extrude(amount=10, mode=Mode.PRIVATE)
    chamfer7_2_piece_2 = split(chamfer7_2_piece_2, bisect_by=Plane(origin=(-26.5, -3, 4.875), z_dir=(0, 1, 0)), keep=Keep.TOP, mode=Mode.PRIVATE)
    chamfer7_2_piece_2 = split(chamfer7_2_piece_2, bisect_by=Plane(origin=(-26.5, 3, 4.875), z_dir=(0, -1, 0)), keep=Keep.TOP, mode=Mode.PRIVATE)
    add(chamfer7_2_piece_2, mode=Mode.SUBTRACT)

    # Chamfer8: one chamfer whose edges measure the first distance from different faces: ONE call of the kernel's chamfer builder (chamfer() names one face for all edges)
    chamfer8_edges_1 = [part.edges().sort_by_distance(p)[0] for p in [
        (66.25, 7.823460599, 15),
    ]]
    chamfer8_side_1 = [part.faces().sort_by_distance(p)[0] for p in [
        (52.5, 1.4117303, 15),
    ]]
    chamfer8_edges_2 = [part.edges().sort_by_distance(p)[0] for p in [
        (38.75, -5, 15),
    ]]
    chamfer8_side_2 = [part.faces().sort_by_distance(p)[0] for p in [
        (38.75, 0, 15),
    ]]
    chamfer8_edges_3 = [part.edges().sort_by_distance(p)[0] for p in [
        (38.75, 5, 15),
    ]]
    chamfer8_side_3 = [part.faces().sort_by_distance(p)[0] for p in [
        (48.75, 9.663076582, 15),
    ]]
    chamfer8 = BRepFilletAPI_MakeChamfer(part.part.solid().wrapped)
    for e in chamfer8_edges_1:
        chamfer8.Add(CHAMFER8_SIZE, CHAMFER8_SIZE2, e.wrapped, chamfer8_side_1[0].wrapped)  # the first distance lies on this face
    for e in chamfer8_edges_2:
        chamfer8.Add(CHAMFER8_SIZE, CHAMFER8_SIZE2_2, e.wrapped, chamfer8_side_2[0].wrapped)  # the first distance lies on this face
    for e in chamfer8_edges_3:
        chamfer8.Add(CHAMFER8_SIZE, CHAMFER8_SIZE2_3, e.wrapped, chamfer8_side_3[0].wrapped)  # the first distance lies on this face
    add(Compound.cast(chamfer8.Shape()), mode=Mode.REPLACE)

    # Sketch19 → Cut-Extrude12 (cut)
    with BuildSketch(Plane.XY.offset(30)):
        with Locations((52.344616806, 6.339273926)):
            Circle(SKETCH19_R)
    extrude(amount=-CUT_EXTRUDE12_DEPTH, mode=Mode.SUBTRACT)

    # Sketch20 → Cut-Extrude13 (cut)
    with BuildSketch(Plane.XY.offset(5)):
        with Locations((-10, 0)):
            Circle(SKETCH20_R)
    extrude(amount=-CUT_EXTRUDE13_DEPTH, mode=Mode.SUBTRACT)


solid = part.part
